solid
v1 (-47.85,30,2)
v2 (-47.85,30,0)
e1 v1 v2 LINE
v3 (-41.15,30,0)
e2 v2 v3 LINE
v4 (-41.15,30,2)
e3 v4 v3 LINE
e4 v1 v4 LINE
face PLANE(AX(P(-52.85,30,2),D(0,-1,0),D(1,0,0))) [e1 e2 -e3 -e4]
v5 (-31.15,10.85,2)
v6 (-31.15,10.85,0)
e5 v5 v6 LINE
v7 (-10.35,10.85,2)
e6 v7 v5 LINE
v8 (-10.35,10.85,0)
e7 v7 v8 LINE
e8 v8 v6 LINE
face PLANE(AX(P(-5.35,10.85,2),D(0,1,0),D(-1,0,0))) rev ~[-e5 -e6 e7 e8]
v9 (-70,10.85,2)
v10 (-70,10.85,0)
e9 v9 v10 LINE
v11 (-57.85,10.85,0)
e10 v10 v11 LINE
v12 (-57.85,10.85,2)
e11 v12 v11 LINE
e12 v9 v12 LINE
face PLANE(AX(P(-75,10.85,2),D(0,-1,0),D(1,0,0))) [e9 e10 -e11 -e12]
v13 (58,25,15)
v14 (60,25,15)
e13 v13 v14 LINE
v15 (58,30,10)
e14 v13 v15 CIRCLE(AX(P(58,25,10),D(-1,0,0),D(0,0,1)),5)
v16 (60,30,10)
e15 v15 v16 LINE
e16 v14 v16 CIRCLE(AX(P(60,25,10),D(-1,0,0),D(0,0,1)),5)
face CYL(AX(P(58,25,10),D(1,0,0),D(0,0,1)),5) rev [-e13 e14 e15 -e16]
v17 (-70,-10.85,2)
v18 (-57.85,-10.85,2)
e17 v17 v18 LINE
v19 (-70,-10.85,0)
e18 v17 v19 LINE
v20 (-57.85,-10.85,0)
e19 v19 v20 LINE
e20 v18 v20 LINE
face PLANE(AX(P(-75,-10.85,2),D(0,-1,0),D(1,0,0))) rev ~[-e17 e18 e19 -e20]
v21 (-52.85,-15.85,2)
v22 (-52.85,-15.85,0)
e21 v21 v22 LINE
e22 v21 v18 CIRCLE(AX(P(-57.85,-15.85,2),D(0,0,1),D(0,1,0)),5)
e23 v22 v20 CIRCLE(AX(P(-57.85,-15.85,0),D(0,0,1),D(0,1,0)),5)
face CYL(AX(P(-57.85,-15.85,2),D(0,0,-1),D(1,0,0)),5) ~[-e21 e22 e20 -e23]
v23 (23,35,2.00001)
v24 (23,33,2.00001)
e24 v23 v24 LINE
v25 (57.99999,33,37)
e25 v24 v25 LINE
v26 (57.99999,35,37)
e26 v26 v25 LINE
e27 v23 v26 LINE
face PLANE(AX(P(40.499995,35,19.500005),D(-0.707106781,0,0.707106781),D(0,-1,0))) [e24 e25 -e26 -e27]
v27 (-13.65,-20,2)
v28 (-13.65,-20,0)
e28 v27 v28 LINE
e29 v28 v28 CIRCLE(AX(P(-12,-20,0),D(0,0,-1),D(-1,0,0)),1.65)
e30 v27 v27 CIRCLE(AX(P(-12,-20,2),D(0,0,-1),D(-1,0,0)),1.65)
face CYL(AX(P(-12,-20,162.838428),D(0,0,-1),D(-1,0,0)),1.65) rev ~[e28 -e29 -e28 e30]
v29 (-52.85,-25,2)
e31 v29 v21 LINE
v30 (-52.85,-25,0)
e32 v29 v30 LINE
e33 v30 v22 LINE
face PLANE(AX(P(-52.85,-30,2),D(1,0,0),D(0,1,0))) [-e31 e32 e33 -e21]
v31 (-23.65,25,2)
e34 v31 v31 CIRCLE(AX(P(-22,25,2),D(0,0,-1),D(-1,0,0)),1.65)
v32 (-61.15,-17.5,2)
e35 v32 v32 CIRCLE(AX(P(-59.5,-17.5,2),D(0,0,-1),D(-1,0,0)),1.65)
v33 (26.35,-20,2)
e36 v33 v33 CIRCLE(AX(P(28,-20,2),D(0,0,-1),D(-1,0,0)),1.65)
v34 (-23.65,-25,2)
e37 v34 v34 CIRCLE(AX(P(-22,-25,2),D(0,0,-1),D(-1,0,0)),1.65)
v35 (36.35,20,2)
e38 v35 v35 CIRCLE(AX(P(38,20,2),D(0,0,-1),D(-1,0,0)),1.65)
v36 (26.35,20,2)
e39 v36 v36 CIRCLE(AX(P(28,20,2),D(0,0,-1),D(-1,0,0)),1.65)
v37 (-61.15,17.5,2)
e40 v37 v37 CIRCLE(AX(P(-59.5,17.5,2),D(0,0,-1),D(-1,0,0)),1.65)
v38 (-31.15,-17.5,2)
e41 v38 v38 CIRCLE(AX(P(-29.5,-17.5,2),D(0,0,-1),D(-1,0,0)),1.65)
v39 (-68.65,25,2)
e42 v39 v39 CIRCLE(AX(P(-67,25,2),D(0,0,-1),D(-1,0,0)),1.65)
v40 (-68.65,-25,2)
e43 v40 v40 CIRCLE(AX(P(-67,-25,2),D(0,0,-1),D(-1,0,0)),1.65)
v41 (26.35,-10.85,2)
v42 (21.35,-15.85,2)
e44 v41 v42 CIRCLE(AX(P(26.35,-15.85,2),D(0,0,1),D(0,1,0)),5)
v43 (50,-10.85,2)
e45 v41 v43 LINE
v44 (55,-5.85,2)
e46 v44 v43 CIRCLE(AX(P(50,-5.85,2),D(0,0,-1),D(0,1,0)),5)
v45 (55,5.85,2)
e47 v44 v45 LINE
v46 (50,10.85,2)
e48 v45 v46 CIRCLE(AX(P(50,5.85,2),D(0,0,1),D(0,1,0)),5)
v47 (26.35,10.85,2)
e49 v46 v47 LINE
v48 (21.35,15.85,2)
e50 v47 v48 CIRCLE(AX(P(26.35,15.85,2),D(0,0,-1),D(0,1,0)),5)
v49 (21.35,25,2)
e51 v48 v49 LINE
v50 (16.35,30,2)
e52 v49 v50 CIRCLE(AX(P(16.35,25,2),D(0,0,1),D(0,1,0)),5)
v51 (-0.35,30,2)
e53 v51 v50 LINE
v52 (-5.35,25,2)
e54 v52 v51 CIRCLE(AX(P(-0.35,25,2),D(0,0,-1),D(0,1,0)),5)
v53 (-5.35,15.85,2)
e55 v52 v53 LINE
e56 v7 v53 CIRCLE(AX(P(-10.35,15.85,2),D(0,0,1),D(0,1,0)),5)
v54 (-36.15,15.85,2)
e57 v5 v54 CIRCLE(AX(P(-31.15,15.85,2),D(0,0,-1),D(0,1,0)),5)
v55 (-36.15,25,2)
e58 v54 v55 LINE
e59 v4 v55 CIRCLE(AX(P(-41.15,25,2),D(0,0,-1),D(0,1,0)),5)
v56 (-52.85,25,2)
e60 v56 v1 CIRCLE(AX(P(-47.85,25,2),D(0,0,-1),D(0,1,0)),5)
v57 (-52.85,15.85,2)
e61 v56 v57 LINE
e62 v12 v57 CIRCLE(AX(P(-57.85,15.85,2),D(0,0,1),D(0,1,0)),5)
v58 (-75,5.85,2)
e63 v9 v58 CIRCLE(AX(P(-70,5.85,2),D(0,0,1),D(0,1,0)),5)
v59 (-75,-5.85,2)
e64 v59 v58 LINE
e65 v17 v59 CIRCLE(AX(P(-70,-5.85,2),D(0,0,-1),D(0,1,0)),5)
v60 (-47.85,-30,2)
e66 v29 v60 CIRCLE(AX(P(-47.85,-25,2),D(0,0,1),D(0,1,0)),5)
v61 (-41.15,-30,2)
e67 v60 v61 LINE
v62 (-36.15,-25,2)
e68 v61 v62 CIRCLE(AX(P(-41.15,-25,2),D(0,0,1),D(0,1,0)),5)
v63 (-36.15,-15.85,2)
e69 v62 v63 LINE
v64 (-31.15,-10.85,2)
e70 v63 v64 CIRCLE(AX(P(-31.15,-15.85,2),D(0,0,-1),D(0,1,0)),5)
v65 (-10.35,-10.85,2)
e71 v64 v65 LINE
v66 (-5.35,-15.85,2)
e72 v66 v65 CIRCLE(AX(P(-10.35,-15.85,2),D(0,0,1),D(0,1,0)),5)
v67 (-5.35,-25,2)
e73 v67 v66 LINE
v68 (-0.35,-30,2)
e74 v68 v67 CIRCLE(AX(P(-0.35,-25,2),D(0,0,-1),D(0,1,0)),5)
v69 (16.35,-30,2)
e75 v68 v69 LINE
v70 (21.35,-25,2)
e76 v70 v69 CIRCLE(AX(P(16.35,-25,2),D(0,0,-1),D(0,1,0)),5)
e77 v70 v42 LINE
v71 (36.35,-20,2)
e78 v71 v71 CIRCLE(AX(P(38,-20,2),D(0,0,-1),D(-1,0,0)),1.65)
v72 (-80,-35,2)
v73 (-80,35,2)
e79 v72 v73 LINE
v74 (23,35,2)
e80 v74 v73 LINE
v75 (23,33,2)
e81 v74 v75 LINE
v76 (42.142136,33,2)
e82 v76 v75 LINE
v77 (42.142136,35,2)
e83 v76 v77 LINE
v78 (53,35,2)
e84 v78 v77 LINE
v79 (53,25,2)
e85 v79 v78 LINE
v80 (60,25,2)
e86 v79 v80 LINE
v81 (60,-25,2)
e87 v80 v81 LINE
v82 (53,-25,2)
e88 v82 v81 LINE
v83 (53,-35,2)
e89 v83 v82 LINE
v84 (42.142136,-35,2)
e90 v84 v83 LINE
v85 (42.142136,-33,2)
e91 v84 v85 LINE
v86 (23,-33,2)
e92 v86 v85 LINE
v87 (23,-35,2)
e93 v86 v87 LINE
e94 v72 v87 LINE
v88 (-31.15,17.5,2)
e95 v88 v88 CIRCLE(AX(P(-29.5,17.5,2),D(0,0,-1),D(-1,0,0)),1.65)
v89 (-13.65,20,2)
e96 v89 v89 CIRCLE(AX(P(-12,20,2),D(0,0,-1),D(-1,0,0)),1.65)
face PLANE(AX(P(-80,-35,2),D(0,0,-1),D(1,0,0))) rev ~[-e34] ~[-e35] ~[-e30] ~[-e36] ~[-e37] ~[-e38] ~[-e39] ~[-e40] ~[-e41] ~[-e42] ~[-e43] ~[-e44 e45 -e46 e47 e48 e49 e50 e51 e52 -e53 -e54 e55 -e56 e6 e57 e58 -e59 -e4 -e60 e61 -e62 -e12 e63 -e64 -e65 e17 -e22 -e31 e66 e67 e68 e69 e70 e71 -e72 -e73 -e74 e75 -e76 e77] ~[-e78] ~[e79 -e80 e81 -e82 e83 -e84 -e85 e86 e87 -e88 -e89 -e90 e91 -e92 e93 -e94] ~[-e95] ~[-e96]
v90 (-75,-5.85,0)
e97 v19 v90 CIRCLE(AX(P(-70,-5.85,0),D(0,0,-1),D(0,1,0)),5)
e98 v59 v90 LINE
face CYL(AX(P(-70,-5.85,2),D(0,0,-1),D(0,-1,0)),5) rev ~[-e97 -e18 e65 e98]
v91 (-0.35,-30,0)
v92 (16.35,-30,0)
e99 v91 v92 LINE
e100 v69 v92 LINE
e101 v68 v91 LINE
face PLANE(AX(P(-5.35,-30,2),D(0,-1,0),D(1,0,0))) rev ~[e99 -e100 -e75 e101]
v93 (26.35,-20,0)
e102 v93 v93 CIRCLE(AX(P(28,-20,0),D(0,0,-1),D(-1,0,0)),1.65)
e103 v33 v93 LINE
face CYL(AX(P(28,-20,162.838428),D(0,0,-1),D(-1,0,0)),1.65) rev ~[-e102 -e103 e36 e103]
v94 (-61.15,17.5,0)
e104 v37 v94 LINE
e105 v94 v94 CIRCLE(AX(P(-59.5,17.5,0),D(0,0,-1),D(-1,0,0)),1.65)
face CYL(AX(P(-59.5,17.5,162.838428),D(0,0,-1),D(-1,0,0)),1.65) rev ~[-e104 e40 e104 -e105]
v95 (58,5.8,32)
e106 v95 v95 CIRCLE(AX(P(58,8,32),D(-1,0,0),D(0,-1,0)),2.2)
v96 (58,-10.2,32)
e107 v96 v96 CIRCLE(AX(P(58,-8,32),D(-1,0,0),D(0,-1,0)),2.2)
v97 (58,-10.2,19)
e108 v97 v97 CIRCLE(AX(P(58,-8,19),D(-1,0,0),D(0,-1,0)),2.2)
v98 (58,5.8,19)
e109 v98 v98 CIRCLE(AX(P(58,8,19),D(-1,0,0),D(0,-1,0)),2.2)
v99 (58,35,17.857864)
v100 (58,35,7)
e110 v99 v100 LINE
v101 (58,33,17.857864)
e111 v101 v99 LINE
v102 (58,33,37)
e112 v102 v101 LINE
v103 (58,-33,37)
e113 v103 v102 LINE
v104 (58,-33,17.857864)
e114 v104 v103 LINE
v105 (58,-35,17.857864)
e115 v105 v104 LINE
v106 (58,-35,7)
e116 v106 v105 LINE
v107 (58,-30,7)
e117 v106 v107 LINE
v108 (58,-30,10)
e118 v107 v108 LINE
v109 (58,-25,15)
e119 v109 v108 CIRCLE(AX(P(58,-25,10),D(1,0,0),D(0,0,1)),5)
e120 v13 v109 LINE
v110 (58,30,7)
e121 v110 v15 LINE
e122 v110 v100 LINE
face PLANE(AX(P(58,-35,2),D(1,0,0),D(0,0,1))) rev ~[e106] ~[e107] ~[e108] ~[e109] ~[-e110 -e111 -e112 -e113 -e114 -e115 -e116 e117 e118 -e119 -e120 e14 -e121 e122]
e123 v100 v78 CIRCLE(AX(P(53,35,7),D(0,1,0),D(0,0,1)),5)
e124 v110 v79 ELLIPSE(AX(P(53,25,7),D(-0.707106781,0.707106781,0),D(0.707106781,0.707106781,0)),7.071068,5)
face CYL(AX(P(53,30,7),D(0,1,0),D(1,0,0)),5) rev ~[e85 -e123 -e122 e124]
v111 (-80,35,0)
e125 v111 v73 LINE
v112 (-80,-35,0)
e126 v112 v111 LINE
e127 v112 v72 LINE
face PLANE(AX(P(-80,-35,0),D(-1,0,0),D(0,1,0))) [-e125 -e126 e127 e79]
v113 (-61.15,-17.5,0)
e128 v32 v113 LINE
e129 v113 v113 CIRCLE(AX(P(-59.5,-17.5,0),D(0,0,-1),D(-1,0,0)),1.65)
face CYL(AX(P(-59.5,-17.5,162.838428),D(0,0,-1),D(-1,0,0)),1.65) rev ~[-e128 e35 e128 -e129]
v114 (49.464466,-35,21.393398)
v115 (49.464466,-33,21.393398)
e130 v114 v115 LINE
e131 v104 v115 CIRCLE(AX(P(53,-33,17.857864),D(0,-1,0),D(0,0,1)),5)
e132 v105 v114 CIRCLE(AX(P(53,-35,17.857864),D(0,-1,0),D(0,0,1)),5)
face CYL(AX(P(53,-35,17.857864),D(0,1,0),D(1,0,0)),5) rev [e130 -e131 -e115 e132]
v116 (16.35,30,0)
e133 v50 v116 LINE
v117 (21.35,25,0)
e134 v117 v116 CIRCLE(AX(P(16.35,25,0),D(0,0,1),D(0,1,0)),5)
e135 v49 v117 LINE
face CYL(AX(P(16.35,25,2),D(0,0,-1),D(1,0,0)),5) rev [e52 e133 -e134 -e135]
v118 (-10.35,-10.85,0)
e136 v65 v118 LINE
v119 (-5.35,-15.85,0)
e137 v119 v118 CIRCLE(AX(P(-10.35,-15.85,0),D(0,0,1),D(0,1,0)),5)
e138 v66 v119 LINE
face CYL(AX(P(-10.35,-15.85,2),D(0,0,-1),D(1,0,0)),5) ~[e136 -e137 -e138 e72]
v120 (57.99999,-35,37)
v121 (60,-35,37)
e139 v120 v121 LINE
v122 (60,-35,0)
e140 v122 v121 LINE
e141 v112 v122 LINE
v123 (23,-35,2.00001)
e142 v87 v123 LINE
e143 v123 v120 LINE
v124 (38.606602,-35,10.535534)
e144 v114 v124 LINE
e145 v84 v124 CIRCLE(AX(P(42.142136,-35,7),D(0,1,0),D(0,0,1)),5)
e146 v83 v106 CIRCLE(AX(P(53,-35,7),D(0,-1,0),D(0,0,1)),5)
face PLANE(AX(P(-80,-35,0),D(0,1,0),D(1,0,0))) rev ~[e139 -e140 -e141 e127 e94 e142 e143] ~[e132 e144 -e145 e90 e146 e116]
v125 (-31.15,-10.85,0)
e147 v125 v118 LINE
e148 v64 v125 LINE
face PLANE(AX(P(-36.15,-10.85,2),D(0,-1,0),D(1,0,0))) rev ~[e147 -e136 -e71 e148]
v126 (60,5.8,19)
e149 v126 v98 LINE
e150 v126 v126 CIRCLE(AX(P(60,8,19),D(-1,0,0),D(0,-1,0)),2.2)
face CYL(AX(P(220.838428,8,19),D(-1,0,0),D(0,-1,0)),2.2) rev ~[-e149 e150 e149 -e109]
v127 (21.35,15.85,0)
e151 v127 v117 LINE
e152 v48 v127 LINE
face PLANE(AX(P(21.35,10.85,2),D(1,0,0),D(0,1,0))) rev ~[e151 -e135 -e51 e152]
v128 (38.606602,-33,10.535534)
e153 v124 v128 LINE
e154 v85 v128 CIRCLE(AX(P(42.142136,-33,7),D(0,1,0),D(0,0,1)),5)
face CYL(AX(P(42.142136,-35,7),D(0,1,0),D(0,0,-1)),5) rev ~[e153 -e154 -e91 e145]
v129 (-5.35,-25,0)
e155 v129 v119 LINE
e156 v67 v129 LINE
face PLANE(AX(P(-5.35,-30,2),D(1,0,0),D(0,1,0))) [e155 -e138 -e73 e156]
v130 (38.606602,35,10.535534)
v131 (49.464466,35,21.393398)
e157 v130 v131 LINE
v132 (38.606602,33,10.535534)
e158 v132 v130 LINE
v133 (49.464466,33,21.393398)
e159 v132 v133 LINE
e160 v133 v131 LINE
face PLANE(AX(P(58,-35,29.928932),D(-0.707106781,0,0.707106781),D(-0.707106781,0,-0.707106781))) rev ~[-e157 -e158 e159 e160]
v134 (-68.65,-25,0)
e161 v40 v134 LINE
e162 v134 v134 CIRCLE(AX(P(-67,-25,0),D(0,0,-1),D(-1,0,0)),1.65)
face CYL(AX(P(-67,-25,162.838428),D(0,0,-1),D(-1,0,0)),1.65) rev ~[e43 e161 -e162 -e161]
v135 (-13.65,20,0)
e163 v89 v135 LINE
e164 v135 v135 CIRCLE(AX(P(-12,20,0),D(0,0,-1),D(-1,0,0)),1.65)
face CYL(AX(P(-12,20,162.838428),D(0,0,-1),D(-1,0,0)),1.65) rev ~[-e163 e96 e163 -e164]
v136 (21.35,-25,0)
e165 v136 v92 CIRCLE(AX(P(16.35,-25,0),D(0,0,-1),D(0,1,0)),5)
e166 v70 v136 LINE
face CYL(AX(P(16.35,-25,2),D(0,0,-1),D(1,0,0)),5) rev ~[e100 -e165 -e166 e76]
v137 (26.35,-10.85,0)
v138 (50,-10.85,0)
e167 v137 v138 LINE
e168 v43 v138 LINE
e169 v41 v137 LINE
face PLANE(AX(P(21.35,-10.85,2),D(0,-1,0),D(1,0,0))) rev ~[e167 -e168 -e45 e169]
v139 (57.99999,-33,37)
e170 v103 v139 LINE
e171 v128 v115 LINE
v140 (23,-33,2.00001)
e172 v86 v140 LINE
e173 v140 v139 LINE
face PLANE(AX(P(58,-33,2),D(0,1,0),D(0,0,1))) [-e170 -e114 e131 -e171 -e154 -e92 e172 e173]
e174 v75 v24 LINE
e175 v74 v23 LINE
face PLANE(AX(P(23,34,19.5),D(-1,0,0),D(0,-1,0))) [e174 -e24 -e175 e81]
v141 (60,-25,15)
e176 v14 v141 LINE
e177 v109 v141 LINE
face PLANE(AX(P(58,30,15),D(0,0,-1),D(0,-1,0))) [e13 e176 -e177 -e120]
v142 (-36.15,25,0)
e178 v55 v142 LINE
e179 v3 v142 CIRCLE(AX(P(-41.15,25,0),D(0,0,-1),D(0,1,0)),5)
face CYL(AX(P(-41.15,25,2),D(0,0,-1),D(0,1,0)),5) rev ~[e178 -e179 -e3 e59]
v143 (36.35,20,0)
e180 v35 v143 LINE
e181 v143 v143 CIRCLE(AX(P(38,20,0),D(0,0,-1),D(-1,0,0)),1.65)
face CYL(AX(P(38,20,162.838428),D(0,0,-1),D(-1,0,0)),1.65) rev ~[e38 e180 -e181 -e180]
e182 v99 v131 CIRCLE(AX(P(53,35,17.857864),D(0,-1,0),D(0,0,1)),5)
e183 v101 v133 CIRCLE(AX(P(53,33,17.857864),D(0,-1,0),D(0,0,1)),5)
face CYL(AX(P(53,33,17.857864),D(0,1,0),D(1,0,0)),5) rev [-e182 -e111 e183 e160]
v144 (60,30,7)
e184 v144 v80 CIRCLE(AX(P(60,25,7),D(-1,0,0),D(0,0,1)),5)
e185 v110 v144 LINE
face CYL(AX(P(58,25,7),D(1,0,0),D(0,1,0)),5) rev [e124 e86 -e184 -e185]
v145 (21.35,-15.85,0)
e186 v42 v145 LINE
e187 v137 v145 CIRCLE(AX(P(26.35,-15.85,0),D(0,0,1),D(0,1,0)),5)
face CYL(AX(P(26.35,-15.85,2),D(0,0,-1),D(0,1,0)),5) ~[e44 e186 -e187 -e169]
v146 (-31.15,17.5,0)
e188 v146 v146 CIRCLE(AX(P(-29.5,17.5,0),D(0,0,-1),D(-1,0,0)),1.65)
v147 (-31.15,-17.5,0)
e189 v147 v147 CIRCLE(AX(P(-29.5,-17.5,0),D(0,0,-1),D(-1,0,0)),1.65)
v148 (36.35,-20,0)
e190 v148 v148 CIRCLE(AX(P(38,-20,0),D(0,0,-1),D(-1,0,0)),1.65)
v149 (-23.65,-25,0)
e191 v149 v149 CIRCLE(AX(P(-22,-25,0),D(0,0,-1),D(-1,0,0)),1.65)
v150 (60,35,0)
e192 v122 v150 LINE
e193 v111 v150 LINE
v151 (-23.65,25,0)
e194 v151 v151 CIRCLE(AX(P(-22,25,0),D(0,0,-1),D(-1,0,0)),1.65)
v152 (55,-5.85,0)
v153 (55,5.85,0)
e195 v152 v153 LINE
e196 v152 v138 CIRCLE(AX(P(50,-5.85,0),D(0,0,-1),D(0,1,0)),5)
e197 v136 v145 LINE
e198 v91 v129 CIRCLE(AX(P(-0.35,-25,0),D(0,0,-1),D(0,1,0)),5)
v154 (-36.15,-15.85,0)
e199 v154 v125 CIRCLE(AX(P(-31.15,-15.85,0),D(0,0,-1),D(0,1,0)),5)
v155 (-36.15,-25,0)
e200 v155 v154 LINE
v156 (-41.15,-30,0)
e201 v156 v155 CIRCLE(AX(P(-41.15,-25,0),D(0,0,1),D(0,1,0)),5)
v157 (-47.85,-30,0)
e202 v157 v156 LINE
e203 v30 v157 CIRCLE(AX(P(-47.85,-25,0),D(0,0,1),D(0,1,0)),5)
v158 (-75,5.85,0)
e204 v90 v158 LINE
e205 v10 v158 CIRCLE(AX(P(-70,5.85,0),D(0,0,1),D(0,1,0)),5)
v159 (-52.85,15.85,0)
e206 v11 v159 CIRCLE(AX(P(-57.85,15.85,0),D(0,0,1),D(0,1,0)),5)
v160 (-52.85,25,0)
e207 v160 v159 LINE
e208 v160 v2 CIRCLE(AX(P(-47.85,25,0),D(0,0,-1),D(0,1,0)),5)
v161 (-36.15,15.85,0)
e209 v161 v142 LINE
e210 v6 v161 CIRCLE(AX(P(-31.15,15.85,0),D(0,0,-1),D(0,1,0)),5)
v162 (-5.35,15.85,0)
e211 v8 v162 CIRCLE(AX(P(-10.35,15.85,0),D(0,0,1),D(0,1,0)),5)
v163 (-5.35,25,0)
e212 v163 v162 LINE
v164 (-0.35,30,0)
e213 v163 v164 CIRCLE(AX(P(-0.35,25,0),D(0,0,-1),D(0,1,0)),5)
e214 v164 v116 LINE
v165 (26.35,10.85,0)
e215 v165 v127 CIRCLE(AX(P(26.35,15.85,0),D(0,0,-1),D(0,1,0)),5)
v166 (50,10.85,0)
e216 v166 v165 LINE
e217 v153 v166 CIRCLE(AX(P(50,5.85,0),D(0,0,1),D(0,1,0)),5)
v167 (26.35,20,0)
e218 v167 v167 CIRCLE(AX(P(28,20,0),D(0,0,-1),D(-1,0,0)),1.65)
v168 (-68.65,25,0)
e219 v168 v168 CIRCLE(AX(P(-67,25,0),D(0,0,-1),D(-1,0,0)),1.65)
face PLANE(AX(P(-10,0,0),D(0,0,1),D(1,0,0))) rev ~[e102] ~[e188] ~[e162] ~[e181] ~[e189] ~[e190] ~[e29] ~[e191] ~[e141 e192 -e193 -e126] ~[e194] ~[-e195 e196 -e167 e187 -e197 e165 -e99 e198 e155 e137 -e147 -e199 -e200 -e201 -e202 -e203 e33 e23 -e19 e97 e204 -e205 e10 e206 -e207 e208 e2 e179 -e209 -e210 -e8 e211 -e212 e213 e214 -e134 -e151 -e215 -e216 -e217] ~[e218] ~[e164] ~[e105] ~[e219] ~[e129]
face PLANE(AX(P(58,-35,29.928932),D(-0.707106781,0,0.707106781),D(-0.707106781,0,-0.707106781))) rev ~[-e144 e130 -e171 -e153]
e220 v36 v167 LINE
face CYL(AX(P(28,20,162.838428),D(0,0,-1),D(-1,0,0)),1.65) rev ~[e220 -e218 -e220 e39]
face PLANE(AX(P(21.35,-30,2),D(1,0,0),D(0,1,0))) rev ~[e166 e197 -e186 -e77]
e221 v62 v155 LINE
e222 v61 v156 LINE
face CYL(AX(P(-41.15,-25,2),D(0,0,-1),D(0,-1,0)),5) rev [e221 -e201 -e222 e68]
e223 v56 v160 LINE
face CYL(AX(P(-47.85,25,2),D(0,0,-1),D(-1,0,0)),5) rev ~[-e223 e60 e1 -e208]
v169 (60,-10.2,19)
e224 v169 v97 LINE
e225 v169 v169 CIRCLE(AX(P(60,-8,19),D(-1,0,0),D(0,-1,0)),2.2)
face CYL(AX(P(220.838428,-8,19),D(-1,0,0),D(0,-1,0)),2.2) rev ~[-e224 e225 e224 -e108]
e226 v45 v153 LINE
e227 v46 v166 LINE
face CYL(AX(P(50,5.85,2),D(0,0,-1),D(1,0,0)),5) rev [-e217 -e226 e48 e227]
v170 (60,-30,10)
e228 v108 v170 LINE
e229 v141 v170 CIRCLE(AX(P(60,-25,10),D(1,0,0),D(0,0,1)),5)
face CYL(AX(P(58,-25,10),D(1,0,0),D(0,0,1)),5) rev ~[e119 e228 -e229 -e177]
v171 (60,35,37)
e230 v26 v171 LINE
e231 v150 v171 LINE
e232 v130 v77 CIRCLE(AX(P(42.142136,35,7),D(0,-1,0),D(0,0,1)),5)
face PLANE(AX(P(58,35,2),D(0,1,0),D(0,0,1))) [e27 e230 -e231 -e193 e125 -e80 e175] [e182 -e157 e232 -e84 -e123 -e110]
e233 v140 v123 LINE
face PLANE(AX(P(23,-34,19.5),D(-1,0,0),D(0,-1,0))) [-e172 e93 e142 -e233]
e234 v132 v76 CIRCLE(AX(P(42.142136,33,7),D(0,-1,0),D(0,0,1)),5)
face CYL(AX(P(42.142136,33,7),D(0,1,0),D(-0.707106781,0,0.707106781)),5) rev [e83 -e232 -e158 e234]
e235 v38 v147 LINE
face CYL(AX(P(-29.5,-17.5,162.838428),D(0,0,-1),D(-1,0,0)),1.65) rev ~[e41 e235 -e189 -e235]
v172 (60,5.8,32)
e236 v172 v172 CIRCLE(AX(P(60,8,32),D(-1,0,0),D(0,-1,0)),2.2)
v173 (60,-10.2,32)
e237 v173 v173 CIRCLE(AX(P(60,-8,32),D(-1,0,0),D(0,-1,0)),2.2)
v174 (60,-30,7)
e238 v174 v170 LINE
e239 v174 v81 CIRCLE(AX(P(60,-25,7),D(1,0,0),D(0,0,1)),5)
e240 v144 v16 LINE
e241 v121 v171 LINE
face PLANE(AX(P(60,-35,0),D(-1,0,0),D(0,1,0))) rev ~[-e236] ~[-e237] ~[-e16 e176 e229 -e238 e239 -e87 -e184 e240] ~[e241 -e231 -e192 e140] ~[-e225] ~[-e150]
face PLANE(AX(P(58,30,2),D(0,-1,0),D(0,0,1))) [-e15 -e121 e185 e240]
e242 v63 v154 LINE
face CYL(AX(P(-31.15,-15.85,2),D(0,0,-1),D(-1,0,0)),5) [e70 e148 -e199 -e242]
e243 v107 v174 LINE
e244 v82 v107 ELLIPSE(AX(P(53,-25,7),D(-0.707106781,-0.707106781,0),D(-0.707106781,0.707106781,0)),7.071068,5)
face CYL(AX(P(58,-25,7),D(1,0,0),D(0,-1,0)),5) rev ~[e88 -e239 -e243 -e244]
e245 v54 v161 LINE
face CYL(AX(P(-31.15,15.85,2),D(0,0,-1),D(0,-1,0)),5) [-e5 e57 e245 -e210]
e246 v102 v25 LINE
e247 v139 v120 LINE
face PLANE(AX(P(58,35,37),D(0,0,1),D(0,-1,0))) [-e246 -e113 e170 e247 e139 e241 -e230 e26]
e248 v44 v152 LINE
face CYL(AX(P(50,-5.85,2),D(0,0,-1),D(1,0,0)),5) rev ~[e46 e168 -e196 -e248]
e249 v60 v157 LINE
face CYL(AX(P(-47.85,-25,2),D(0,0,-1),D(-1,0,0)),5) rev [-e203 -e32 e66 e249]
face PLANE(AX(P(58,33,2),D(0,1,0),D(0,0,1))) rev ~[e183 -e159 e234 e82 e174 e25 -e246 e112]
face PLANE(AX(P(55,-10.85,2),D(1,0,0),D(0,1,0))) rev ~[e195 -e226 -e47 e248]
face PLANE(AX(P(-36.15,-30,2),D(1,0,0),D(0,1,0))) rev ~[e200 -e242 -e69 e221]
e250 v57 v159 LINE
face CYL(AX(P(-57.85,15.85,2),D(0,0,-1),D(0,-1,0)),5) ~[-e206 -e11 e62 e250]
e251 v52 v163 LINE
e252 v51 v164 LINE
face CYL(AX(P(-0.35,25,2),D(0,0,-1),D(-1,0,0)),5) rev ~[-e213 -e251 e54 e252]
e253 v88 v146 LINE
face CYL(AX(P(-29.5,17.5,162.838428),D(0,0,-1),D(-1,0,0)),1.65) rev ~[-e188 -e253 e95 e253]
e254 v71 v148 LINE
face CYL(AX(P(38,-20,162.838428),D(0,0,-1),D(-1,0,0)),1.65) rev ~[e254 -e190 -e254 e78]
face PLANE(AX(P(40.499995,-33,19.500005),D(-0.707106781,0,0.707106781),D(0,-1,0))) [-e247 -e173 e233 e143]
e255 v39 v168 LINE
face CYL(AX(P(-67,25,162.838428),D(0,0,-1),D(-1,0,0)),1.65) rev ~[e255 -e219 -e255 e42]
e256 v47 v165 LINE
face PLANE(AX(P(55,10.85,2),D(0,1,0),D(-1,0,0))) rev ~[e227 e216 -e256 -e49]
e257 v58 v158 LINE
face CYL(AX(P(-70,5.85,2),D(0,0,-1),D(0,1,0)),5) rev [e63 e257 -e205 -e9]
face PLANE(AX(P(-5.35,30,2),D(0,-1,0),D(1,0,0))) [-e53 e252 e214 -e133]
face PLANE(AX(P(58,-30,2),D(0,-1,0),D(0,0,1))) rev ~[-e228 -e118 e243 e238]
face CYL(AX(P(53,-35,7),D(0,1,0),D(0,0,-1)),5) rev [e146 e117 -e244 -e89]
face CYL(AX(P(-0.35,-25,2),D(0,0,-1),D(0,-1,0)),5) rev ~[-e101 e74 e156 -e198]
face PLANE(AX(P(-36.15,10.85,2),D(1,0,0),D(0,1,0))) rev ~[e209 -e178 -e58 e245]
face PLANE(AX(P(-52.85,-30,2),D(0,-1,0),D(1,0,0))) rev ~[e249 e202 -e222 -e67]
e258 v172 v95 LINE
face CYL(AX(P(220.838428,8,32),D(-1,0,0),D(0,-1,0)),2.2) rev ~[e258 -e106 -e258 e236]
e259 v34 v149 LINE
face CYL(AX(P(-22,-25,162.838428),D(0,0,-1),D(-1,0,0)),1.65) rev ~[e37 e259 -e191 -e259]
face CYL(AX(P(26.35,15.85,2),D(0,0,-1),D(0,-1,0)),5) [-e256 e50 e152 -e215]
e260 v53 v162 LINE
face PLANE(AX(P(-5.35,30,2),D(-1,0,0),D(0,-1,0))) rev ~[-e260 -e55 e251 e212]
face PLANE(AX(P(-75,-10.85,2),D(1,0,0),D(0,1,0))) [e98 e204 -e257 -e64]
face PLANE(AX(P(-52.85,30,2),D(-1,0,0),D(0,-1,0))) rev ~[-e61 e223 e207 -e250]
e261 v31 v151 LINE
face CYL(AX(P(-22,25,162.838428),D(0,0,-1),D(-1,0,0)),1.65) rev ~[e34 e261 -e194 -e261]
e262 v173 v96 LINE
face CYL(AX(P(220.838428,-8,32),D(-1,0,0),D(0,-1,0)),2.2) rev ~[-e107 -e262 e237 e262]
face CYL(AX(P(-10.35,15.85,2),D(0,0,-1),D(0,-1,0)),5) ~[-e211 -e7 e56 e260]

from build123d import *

# Parameters (mm, degrees)
F0_W      = 140
F0_H      = 70
F1_DEPTH  = 37
F2_W      = 138
F2_H      = 35
F3_DEPTH  = 70.001
F5_D      = 3.3
F6_W      = 2
F6_H      = 35
F7_DEPTH  = 35
F8_SIZE   = 34.99999
F10_DEPTH = 70.001
F11_W     = 60
F11_H     = 13
F12_DEPTH = 2.001
F13_W     = 33.65
F13_H     = 21.7
F13_W_2   = 26.7
F13_H_2   = 19.15
F13_W_3   = 30.8
F13_W_4   = 16.7
F13_W_5   = 22.15
F14_DEPTH = 2.001
F15_R     = 5
F17_D     = 4.4


# Not quite as in the source:
# - a fillet or chamfer is up to 0.001 mm smaller than in the source, because OpenCascade refuses the exact size
# - a feature names something its author has since deleted; it is built from what else it names


with BuildPart() as f1:
    # F0 (on Top) → F1 (new body)
    with BuildSketch(Plane.XY):
        with Locations((-10, 0)):
            Rectangle(F0_W, F0_H)
    extrude(amount=F1_DEPTH)

    # F2 (on face) → F3 (cut, through all)
    with BuildSketch(Plane.XZ.offset(35)):
        with Locations((-11, 19.5)):
            Rectangle(F2_W, F2_H)
    extrude(amount=-F3_DEPTH, mode=Mode.SUBTRACT)

    # F5 (through all)
    with Locations(Plane.XY.offset(2)):
        with Locations((-67, 25), (-59.5, 17.5), (-67, -25), (-59.5, -17.5), (-29.5, -17.5), (-22, -25), (-12, -20), (-12, 20), (-22, 25), (-29.5, 17.5), (28, 20), (38, 20), (38, -20), (28, -20)):
            Hole(F5_D / 2)

    # F6 (on face) → F7 (join)
    with BuildSketch(Plane(origin=(58, 0, 0), x_dir=(0, -1, 0), z_dir=(-1, 0, 0))):
        with Locations((-34, 19.5)):
            Rectangle(F6_W, F6_H)
        with Locations((34, 19.5)):
            Rectangle(F6_W, F6_H)
    extrude(amount=F7_DEPTH)

    # F8 (size 35 in the source; OpenCascade refuses exactly that, so slightly less here)
    f8_edges = [f1.edges().sort_by_distance(p)[0] for p in [
        (23, -34, 37),
        (23, 34, 37),
    ]]
    chamfer(f8_edges, length=F8_SIZE)

    # F9 (on face) → F10 (cut, through all)
    with BuildSketch(Plane.XZ.offset(35)):
        Polygon((58, 2), (58, 29.9289321881), (30.0710678119, 2), align=None)
    extrude(amount=-F10_DEPTH, mode=Mode.SUBTRACT)

    # F11 (on face) → F12 (cut, through all)
    with BuildSketch(Plane(origin=(58, 0, 0), x_dir=(0, -1, 0), z_dir=(-1, 0, 0))):
        with Locations((0, 8.5)):
            Rectangle(F11_W, F11_H)
    extrude(amount=-F12_DEPTH, mode=Mode.SUBTRACT)

    # F13 (on face) → F14 (cut, through all)
    with BuildSketch(Plane.XY.offset(2)):
        with Locations((38.175, 0)):
            Rectangle(F13_W, F13_H)
        with Locations((8, 0)):
            Rectangle(F13_W_2, F13_H)
        with Locations((8, 20.425)):
            Rectangle(F13_W_2, F13_H_2)
        with Locations((-20.75, 0)):
            Rectangle(F13_W_3, F13_H)
        with Locations((8, -20.425)):
            Rectangle(F13_W_2, F13_H_2)
        with Locations((-44.5, 0)):
            Rectangle(F13_W_4, F13_H)
        with Locations((-44.5, 20.425)):
            Rectangle(F13_W_4, F13_H_2)
        with Locations((-63.925, 0)):
            Rectangle(F13_W_5, F13_H)
        with Locations((-44.5, -20.425)):
            Rectangle(F13_W_4, F13_H_2)
    extrude(amount=-F14_DEPTH, mode=Mode.SUBTRACT)

    # F15 (call 1 of 28: OpenCascade refuses the feature's edges together)
    f15_edges = [f1.edges().sort_by_distance(p)[0] for p in [
        (55, 10.85, 1),
    ]]
    fillet(f15_edges, radius=F15_R)

    # F15#2 (call 2 of 28)
    f15_2_edges = [f1.edges().sort_by_distance(p)[0] for p in [
        (55, -10.85, 1),
    ]]
    fillet(f15_2_edges, radius=F15_R)

    # F15#3 (call 3 of 28)
    f15_3_edges = [f1.edges().sort_by_distance(p)[0] for p in [
        (21.35, -10.85, 1),
    ]]
    fillet(f15_3_edges, radius=F15_R)

    # F15#4 (call 4 of 28)
    f15_4_edges = [f1.edges().sort_by_distance(p)[0] for p in [
        (21.35, 10.85, 1),
    ]]
    fillet(f15_4_edges, radius=F15_R)

    # F15#5 (call 5 of 28)
    f15_5_edges = [f1.edges().sort_by_distance(p)[0] for p in [
        (21.35, -30, 1),
    ]]
    fillet(f15_5_edges, radius=F15_R)

    # F15#6 (call 6 of 28)
    f15_6_edges = [f1.edges().sort_by_distance(p)[0] for p in [
        (21.35, 30, 1),
    ]]
    fillet(f15_6_edges, radius=F15_R)

    # F15#7 (call 7 of 28)
    f15_7_edges = [f1.edges().sort_by_distance(p)[0] for p in [
        (-5.35, -30, 1),
    ]]
    fillet(f15_7_edges, radius=F15_R)

    # F15#8 (call 8 of 28)
    f15_8_edges = [f1.edges().sort_by_distance(p)[0] for p in [
        (-5.35, -10.85, 1),
    ]]
    fillet(f15_8_edges, radius=F15_R)

    # F15#9 (call 9 of 28)
    f15_9_edges = [f1.edges().sort_by_distance(p)[0] for p in [
        (-5.35, 10.85, 1),
    ]]
    fillet(f15_9_edges, radius=F15_R)

    # F15#10 (call 10 of 28)
    f15_10_edges = [f1.edges().sort_by_distance(p)[0] for p in [
        (-5.35, 30, 1),
    ]]
    fillet(f15_10_edges, radius=F15_R)

    # F15#11 (call 11 of 28)
    f15_11_edges = [f1.edges().sort_by_distance(p)[0] for p in [
        (-36.15, 10.85, 1),
    ]]
    fillet(f15_11_edges, radius=F15_R)

    # F15#12 (call 12 of 28)
    f15_12_edges = [f1.edges().sort_by_distance(p)[0] for p in [
        (-36.15, -30, 1),
    ]]
    fillet(f15_12_edges, radius=F15_R)

    # F15#13 (call 13 of 28)
    f15_13_edges = [f1.edges().sort_by_distance(p)[0] for p in [
        (-36.15, -10.85, 1),
    ]]
    fillet(f15_13_edges, radius=F15_R)

    # F15#14 (call 14 of 28)
    f15_14_edges = [f1.edges().sort_by_distance(p)[0] for p in [
        (-36.15, 30, 1),
    ]]
    fillet(f15_14_edges, radius=F15_R)

    # F15#15 (call 15 of 28)
    f15_15_edges = [f1.edges().sort_by_distance(p)[0] for p in [
        (-52.85, -30, 1),
    ]]
    fillet(f15_15_edges, radius=F15_R)

    # F15#16 (call 16 of 28)
    f15_16_edges = [f1.edges().sort_by_distance(p)[0] for p in [
        (-52.85, -10.85, 1),
    ]]
    fillet(f15_16_edges, radius=F15_R)

    # F15#17 (call 17 of 28)
    f15_17_edges = [f1.edges().sort_by_distance(p)[0] for p in [
        (-75, -10.85, 1),
    ]]
    fillet(f15_17_edges, radius=F15_R)

    # F15#18 (call 18 of 28)
    f15_18_edges = [f1.edges().sort_by_distance(p)[0] for p in [
        (-52.85, 10.85, 1),
    ]]
    fillet(f15_18_edges, radius=F15_R)

    # F15#19 (call 19 of 28)
    f15_19_edges = [f1.edges().sort_by_distance(p)[0] for p in [
        (-75, 10.85, 1),
    ]]
    fillet(f15_19_edges, radius=F15_R)

    # F15#20 (call 20 of 28)
    f15_20_edges = [f1.edges().sort_by_distance(p)[0] for p in [
        (-52.85, 30, 1),
    ]]
    fillet(f15_20_edges, radius=F15_R)

    # F15#21 (call 21 of 28)
    f15_21_edges = [f1.edges().sort_by_distance(p)[0] for p in [
        (30.071068, -34, 2),
    ]]
    fillet(f15_21_edges, radius=F15_R)

    # F15#22 (call 22 of 28)
    f15_22_edges = [f1.edges().sort_by_distance(p)[0] for p in [
        (30.071068, 34, 2),
    ]]
    fillet(f15_22_edges, radius=F15_R)

    # F15#23 (call 23 of 28)
    f15_23_edges = [f1.edges().sort_by_distance(p)[0] for p in [
        (58, 32.5, 2),
        (59, 30, 2),
    ]]
    fillet(f15_23_edges, radius=F15_R)

    # F15#24 (call 24 of 28)
    f15_24_edges = [f1.edges().sort_by_distance(p)[0] for p in [
        (58, 34, 29.928932),
    ]]
    fillet(f15_24_edges, radius=F15_R)

    # F15#25 (call 25 of 28)
    f15_25_edges = [f1.edges().sort_by_distance(p)[0] for p in [
        (58, -32.5, 2),
        (59, -30, 2),
    ]]
    fillet(f15_25_edges, radius=F15_R)

    # F15#26 (call 26 of 28)
    f15_26_edges = [f1.edges().sort_by_distance(p)[0] for p in [
        (58, -34, 29.928932),
    ]]
    fillet(f15_26_edges, radius=F15_R)

    # F15#27 (call 27 of 28)
    f15_27_edges = [f1.edges().sort_by_distance(p)[0] for p in [
        (59, -30, 15),
    ]]
    fillet(f15_27_edges, radius=F15_R)

    # F15#28 (call 28 of 28)
    f15_28_edges = [f1.edges().sort_by_distance(p)[0] for p in [
        (59, 30, 15),
    ]]
    fillet(f15_28_edges, radius=F15_R)

    # F17 (through all)
    with Locations(Plane.YZ.offset(60)):
        with Locations((-8, 32), (8, 32), (-8, 19), (8, 19)):
            Hole(F17_D / 2)


solid = f1.part
